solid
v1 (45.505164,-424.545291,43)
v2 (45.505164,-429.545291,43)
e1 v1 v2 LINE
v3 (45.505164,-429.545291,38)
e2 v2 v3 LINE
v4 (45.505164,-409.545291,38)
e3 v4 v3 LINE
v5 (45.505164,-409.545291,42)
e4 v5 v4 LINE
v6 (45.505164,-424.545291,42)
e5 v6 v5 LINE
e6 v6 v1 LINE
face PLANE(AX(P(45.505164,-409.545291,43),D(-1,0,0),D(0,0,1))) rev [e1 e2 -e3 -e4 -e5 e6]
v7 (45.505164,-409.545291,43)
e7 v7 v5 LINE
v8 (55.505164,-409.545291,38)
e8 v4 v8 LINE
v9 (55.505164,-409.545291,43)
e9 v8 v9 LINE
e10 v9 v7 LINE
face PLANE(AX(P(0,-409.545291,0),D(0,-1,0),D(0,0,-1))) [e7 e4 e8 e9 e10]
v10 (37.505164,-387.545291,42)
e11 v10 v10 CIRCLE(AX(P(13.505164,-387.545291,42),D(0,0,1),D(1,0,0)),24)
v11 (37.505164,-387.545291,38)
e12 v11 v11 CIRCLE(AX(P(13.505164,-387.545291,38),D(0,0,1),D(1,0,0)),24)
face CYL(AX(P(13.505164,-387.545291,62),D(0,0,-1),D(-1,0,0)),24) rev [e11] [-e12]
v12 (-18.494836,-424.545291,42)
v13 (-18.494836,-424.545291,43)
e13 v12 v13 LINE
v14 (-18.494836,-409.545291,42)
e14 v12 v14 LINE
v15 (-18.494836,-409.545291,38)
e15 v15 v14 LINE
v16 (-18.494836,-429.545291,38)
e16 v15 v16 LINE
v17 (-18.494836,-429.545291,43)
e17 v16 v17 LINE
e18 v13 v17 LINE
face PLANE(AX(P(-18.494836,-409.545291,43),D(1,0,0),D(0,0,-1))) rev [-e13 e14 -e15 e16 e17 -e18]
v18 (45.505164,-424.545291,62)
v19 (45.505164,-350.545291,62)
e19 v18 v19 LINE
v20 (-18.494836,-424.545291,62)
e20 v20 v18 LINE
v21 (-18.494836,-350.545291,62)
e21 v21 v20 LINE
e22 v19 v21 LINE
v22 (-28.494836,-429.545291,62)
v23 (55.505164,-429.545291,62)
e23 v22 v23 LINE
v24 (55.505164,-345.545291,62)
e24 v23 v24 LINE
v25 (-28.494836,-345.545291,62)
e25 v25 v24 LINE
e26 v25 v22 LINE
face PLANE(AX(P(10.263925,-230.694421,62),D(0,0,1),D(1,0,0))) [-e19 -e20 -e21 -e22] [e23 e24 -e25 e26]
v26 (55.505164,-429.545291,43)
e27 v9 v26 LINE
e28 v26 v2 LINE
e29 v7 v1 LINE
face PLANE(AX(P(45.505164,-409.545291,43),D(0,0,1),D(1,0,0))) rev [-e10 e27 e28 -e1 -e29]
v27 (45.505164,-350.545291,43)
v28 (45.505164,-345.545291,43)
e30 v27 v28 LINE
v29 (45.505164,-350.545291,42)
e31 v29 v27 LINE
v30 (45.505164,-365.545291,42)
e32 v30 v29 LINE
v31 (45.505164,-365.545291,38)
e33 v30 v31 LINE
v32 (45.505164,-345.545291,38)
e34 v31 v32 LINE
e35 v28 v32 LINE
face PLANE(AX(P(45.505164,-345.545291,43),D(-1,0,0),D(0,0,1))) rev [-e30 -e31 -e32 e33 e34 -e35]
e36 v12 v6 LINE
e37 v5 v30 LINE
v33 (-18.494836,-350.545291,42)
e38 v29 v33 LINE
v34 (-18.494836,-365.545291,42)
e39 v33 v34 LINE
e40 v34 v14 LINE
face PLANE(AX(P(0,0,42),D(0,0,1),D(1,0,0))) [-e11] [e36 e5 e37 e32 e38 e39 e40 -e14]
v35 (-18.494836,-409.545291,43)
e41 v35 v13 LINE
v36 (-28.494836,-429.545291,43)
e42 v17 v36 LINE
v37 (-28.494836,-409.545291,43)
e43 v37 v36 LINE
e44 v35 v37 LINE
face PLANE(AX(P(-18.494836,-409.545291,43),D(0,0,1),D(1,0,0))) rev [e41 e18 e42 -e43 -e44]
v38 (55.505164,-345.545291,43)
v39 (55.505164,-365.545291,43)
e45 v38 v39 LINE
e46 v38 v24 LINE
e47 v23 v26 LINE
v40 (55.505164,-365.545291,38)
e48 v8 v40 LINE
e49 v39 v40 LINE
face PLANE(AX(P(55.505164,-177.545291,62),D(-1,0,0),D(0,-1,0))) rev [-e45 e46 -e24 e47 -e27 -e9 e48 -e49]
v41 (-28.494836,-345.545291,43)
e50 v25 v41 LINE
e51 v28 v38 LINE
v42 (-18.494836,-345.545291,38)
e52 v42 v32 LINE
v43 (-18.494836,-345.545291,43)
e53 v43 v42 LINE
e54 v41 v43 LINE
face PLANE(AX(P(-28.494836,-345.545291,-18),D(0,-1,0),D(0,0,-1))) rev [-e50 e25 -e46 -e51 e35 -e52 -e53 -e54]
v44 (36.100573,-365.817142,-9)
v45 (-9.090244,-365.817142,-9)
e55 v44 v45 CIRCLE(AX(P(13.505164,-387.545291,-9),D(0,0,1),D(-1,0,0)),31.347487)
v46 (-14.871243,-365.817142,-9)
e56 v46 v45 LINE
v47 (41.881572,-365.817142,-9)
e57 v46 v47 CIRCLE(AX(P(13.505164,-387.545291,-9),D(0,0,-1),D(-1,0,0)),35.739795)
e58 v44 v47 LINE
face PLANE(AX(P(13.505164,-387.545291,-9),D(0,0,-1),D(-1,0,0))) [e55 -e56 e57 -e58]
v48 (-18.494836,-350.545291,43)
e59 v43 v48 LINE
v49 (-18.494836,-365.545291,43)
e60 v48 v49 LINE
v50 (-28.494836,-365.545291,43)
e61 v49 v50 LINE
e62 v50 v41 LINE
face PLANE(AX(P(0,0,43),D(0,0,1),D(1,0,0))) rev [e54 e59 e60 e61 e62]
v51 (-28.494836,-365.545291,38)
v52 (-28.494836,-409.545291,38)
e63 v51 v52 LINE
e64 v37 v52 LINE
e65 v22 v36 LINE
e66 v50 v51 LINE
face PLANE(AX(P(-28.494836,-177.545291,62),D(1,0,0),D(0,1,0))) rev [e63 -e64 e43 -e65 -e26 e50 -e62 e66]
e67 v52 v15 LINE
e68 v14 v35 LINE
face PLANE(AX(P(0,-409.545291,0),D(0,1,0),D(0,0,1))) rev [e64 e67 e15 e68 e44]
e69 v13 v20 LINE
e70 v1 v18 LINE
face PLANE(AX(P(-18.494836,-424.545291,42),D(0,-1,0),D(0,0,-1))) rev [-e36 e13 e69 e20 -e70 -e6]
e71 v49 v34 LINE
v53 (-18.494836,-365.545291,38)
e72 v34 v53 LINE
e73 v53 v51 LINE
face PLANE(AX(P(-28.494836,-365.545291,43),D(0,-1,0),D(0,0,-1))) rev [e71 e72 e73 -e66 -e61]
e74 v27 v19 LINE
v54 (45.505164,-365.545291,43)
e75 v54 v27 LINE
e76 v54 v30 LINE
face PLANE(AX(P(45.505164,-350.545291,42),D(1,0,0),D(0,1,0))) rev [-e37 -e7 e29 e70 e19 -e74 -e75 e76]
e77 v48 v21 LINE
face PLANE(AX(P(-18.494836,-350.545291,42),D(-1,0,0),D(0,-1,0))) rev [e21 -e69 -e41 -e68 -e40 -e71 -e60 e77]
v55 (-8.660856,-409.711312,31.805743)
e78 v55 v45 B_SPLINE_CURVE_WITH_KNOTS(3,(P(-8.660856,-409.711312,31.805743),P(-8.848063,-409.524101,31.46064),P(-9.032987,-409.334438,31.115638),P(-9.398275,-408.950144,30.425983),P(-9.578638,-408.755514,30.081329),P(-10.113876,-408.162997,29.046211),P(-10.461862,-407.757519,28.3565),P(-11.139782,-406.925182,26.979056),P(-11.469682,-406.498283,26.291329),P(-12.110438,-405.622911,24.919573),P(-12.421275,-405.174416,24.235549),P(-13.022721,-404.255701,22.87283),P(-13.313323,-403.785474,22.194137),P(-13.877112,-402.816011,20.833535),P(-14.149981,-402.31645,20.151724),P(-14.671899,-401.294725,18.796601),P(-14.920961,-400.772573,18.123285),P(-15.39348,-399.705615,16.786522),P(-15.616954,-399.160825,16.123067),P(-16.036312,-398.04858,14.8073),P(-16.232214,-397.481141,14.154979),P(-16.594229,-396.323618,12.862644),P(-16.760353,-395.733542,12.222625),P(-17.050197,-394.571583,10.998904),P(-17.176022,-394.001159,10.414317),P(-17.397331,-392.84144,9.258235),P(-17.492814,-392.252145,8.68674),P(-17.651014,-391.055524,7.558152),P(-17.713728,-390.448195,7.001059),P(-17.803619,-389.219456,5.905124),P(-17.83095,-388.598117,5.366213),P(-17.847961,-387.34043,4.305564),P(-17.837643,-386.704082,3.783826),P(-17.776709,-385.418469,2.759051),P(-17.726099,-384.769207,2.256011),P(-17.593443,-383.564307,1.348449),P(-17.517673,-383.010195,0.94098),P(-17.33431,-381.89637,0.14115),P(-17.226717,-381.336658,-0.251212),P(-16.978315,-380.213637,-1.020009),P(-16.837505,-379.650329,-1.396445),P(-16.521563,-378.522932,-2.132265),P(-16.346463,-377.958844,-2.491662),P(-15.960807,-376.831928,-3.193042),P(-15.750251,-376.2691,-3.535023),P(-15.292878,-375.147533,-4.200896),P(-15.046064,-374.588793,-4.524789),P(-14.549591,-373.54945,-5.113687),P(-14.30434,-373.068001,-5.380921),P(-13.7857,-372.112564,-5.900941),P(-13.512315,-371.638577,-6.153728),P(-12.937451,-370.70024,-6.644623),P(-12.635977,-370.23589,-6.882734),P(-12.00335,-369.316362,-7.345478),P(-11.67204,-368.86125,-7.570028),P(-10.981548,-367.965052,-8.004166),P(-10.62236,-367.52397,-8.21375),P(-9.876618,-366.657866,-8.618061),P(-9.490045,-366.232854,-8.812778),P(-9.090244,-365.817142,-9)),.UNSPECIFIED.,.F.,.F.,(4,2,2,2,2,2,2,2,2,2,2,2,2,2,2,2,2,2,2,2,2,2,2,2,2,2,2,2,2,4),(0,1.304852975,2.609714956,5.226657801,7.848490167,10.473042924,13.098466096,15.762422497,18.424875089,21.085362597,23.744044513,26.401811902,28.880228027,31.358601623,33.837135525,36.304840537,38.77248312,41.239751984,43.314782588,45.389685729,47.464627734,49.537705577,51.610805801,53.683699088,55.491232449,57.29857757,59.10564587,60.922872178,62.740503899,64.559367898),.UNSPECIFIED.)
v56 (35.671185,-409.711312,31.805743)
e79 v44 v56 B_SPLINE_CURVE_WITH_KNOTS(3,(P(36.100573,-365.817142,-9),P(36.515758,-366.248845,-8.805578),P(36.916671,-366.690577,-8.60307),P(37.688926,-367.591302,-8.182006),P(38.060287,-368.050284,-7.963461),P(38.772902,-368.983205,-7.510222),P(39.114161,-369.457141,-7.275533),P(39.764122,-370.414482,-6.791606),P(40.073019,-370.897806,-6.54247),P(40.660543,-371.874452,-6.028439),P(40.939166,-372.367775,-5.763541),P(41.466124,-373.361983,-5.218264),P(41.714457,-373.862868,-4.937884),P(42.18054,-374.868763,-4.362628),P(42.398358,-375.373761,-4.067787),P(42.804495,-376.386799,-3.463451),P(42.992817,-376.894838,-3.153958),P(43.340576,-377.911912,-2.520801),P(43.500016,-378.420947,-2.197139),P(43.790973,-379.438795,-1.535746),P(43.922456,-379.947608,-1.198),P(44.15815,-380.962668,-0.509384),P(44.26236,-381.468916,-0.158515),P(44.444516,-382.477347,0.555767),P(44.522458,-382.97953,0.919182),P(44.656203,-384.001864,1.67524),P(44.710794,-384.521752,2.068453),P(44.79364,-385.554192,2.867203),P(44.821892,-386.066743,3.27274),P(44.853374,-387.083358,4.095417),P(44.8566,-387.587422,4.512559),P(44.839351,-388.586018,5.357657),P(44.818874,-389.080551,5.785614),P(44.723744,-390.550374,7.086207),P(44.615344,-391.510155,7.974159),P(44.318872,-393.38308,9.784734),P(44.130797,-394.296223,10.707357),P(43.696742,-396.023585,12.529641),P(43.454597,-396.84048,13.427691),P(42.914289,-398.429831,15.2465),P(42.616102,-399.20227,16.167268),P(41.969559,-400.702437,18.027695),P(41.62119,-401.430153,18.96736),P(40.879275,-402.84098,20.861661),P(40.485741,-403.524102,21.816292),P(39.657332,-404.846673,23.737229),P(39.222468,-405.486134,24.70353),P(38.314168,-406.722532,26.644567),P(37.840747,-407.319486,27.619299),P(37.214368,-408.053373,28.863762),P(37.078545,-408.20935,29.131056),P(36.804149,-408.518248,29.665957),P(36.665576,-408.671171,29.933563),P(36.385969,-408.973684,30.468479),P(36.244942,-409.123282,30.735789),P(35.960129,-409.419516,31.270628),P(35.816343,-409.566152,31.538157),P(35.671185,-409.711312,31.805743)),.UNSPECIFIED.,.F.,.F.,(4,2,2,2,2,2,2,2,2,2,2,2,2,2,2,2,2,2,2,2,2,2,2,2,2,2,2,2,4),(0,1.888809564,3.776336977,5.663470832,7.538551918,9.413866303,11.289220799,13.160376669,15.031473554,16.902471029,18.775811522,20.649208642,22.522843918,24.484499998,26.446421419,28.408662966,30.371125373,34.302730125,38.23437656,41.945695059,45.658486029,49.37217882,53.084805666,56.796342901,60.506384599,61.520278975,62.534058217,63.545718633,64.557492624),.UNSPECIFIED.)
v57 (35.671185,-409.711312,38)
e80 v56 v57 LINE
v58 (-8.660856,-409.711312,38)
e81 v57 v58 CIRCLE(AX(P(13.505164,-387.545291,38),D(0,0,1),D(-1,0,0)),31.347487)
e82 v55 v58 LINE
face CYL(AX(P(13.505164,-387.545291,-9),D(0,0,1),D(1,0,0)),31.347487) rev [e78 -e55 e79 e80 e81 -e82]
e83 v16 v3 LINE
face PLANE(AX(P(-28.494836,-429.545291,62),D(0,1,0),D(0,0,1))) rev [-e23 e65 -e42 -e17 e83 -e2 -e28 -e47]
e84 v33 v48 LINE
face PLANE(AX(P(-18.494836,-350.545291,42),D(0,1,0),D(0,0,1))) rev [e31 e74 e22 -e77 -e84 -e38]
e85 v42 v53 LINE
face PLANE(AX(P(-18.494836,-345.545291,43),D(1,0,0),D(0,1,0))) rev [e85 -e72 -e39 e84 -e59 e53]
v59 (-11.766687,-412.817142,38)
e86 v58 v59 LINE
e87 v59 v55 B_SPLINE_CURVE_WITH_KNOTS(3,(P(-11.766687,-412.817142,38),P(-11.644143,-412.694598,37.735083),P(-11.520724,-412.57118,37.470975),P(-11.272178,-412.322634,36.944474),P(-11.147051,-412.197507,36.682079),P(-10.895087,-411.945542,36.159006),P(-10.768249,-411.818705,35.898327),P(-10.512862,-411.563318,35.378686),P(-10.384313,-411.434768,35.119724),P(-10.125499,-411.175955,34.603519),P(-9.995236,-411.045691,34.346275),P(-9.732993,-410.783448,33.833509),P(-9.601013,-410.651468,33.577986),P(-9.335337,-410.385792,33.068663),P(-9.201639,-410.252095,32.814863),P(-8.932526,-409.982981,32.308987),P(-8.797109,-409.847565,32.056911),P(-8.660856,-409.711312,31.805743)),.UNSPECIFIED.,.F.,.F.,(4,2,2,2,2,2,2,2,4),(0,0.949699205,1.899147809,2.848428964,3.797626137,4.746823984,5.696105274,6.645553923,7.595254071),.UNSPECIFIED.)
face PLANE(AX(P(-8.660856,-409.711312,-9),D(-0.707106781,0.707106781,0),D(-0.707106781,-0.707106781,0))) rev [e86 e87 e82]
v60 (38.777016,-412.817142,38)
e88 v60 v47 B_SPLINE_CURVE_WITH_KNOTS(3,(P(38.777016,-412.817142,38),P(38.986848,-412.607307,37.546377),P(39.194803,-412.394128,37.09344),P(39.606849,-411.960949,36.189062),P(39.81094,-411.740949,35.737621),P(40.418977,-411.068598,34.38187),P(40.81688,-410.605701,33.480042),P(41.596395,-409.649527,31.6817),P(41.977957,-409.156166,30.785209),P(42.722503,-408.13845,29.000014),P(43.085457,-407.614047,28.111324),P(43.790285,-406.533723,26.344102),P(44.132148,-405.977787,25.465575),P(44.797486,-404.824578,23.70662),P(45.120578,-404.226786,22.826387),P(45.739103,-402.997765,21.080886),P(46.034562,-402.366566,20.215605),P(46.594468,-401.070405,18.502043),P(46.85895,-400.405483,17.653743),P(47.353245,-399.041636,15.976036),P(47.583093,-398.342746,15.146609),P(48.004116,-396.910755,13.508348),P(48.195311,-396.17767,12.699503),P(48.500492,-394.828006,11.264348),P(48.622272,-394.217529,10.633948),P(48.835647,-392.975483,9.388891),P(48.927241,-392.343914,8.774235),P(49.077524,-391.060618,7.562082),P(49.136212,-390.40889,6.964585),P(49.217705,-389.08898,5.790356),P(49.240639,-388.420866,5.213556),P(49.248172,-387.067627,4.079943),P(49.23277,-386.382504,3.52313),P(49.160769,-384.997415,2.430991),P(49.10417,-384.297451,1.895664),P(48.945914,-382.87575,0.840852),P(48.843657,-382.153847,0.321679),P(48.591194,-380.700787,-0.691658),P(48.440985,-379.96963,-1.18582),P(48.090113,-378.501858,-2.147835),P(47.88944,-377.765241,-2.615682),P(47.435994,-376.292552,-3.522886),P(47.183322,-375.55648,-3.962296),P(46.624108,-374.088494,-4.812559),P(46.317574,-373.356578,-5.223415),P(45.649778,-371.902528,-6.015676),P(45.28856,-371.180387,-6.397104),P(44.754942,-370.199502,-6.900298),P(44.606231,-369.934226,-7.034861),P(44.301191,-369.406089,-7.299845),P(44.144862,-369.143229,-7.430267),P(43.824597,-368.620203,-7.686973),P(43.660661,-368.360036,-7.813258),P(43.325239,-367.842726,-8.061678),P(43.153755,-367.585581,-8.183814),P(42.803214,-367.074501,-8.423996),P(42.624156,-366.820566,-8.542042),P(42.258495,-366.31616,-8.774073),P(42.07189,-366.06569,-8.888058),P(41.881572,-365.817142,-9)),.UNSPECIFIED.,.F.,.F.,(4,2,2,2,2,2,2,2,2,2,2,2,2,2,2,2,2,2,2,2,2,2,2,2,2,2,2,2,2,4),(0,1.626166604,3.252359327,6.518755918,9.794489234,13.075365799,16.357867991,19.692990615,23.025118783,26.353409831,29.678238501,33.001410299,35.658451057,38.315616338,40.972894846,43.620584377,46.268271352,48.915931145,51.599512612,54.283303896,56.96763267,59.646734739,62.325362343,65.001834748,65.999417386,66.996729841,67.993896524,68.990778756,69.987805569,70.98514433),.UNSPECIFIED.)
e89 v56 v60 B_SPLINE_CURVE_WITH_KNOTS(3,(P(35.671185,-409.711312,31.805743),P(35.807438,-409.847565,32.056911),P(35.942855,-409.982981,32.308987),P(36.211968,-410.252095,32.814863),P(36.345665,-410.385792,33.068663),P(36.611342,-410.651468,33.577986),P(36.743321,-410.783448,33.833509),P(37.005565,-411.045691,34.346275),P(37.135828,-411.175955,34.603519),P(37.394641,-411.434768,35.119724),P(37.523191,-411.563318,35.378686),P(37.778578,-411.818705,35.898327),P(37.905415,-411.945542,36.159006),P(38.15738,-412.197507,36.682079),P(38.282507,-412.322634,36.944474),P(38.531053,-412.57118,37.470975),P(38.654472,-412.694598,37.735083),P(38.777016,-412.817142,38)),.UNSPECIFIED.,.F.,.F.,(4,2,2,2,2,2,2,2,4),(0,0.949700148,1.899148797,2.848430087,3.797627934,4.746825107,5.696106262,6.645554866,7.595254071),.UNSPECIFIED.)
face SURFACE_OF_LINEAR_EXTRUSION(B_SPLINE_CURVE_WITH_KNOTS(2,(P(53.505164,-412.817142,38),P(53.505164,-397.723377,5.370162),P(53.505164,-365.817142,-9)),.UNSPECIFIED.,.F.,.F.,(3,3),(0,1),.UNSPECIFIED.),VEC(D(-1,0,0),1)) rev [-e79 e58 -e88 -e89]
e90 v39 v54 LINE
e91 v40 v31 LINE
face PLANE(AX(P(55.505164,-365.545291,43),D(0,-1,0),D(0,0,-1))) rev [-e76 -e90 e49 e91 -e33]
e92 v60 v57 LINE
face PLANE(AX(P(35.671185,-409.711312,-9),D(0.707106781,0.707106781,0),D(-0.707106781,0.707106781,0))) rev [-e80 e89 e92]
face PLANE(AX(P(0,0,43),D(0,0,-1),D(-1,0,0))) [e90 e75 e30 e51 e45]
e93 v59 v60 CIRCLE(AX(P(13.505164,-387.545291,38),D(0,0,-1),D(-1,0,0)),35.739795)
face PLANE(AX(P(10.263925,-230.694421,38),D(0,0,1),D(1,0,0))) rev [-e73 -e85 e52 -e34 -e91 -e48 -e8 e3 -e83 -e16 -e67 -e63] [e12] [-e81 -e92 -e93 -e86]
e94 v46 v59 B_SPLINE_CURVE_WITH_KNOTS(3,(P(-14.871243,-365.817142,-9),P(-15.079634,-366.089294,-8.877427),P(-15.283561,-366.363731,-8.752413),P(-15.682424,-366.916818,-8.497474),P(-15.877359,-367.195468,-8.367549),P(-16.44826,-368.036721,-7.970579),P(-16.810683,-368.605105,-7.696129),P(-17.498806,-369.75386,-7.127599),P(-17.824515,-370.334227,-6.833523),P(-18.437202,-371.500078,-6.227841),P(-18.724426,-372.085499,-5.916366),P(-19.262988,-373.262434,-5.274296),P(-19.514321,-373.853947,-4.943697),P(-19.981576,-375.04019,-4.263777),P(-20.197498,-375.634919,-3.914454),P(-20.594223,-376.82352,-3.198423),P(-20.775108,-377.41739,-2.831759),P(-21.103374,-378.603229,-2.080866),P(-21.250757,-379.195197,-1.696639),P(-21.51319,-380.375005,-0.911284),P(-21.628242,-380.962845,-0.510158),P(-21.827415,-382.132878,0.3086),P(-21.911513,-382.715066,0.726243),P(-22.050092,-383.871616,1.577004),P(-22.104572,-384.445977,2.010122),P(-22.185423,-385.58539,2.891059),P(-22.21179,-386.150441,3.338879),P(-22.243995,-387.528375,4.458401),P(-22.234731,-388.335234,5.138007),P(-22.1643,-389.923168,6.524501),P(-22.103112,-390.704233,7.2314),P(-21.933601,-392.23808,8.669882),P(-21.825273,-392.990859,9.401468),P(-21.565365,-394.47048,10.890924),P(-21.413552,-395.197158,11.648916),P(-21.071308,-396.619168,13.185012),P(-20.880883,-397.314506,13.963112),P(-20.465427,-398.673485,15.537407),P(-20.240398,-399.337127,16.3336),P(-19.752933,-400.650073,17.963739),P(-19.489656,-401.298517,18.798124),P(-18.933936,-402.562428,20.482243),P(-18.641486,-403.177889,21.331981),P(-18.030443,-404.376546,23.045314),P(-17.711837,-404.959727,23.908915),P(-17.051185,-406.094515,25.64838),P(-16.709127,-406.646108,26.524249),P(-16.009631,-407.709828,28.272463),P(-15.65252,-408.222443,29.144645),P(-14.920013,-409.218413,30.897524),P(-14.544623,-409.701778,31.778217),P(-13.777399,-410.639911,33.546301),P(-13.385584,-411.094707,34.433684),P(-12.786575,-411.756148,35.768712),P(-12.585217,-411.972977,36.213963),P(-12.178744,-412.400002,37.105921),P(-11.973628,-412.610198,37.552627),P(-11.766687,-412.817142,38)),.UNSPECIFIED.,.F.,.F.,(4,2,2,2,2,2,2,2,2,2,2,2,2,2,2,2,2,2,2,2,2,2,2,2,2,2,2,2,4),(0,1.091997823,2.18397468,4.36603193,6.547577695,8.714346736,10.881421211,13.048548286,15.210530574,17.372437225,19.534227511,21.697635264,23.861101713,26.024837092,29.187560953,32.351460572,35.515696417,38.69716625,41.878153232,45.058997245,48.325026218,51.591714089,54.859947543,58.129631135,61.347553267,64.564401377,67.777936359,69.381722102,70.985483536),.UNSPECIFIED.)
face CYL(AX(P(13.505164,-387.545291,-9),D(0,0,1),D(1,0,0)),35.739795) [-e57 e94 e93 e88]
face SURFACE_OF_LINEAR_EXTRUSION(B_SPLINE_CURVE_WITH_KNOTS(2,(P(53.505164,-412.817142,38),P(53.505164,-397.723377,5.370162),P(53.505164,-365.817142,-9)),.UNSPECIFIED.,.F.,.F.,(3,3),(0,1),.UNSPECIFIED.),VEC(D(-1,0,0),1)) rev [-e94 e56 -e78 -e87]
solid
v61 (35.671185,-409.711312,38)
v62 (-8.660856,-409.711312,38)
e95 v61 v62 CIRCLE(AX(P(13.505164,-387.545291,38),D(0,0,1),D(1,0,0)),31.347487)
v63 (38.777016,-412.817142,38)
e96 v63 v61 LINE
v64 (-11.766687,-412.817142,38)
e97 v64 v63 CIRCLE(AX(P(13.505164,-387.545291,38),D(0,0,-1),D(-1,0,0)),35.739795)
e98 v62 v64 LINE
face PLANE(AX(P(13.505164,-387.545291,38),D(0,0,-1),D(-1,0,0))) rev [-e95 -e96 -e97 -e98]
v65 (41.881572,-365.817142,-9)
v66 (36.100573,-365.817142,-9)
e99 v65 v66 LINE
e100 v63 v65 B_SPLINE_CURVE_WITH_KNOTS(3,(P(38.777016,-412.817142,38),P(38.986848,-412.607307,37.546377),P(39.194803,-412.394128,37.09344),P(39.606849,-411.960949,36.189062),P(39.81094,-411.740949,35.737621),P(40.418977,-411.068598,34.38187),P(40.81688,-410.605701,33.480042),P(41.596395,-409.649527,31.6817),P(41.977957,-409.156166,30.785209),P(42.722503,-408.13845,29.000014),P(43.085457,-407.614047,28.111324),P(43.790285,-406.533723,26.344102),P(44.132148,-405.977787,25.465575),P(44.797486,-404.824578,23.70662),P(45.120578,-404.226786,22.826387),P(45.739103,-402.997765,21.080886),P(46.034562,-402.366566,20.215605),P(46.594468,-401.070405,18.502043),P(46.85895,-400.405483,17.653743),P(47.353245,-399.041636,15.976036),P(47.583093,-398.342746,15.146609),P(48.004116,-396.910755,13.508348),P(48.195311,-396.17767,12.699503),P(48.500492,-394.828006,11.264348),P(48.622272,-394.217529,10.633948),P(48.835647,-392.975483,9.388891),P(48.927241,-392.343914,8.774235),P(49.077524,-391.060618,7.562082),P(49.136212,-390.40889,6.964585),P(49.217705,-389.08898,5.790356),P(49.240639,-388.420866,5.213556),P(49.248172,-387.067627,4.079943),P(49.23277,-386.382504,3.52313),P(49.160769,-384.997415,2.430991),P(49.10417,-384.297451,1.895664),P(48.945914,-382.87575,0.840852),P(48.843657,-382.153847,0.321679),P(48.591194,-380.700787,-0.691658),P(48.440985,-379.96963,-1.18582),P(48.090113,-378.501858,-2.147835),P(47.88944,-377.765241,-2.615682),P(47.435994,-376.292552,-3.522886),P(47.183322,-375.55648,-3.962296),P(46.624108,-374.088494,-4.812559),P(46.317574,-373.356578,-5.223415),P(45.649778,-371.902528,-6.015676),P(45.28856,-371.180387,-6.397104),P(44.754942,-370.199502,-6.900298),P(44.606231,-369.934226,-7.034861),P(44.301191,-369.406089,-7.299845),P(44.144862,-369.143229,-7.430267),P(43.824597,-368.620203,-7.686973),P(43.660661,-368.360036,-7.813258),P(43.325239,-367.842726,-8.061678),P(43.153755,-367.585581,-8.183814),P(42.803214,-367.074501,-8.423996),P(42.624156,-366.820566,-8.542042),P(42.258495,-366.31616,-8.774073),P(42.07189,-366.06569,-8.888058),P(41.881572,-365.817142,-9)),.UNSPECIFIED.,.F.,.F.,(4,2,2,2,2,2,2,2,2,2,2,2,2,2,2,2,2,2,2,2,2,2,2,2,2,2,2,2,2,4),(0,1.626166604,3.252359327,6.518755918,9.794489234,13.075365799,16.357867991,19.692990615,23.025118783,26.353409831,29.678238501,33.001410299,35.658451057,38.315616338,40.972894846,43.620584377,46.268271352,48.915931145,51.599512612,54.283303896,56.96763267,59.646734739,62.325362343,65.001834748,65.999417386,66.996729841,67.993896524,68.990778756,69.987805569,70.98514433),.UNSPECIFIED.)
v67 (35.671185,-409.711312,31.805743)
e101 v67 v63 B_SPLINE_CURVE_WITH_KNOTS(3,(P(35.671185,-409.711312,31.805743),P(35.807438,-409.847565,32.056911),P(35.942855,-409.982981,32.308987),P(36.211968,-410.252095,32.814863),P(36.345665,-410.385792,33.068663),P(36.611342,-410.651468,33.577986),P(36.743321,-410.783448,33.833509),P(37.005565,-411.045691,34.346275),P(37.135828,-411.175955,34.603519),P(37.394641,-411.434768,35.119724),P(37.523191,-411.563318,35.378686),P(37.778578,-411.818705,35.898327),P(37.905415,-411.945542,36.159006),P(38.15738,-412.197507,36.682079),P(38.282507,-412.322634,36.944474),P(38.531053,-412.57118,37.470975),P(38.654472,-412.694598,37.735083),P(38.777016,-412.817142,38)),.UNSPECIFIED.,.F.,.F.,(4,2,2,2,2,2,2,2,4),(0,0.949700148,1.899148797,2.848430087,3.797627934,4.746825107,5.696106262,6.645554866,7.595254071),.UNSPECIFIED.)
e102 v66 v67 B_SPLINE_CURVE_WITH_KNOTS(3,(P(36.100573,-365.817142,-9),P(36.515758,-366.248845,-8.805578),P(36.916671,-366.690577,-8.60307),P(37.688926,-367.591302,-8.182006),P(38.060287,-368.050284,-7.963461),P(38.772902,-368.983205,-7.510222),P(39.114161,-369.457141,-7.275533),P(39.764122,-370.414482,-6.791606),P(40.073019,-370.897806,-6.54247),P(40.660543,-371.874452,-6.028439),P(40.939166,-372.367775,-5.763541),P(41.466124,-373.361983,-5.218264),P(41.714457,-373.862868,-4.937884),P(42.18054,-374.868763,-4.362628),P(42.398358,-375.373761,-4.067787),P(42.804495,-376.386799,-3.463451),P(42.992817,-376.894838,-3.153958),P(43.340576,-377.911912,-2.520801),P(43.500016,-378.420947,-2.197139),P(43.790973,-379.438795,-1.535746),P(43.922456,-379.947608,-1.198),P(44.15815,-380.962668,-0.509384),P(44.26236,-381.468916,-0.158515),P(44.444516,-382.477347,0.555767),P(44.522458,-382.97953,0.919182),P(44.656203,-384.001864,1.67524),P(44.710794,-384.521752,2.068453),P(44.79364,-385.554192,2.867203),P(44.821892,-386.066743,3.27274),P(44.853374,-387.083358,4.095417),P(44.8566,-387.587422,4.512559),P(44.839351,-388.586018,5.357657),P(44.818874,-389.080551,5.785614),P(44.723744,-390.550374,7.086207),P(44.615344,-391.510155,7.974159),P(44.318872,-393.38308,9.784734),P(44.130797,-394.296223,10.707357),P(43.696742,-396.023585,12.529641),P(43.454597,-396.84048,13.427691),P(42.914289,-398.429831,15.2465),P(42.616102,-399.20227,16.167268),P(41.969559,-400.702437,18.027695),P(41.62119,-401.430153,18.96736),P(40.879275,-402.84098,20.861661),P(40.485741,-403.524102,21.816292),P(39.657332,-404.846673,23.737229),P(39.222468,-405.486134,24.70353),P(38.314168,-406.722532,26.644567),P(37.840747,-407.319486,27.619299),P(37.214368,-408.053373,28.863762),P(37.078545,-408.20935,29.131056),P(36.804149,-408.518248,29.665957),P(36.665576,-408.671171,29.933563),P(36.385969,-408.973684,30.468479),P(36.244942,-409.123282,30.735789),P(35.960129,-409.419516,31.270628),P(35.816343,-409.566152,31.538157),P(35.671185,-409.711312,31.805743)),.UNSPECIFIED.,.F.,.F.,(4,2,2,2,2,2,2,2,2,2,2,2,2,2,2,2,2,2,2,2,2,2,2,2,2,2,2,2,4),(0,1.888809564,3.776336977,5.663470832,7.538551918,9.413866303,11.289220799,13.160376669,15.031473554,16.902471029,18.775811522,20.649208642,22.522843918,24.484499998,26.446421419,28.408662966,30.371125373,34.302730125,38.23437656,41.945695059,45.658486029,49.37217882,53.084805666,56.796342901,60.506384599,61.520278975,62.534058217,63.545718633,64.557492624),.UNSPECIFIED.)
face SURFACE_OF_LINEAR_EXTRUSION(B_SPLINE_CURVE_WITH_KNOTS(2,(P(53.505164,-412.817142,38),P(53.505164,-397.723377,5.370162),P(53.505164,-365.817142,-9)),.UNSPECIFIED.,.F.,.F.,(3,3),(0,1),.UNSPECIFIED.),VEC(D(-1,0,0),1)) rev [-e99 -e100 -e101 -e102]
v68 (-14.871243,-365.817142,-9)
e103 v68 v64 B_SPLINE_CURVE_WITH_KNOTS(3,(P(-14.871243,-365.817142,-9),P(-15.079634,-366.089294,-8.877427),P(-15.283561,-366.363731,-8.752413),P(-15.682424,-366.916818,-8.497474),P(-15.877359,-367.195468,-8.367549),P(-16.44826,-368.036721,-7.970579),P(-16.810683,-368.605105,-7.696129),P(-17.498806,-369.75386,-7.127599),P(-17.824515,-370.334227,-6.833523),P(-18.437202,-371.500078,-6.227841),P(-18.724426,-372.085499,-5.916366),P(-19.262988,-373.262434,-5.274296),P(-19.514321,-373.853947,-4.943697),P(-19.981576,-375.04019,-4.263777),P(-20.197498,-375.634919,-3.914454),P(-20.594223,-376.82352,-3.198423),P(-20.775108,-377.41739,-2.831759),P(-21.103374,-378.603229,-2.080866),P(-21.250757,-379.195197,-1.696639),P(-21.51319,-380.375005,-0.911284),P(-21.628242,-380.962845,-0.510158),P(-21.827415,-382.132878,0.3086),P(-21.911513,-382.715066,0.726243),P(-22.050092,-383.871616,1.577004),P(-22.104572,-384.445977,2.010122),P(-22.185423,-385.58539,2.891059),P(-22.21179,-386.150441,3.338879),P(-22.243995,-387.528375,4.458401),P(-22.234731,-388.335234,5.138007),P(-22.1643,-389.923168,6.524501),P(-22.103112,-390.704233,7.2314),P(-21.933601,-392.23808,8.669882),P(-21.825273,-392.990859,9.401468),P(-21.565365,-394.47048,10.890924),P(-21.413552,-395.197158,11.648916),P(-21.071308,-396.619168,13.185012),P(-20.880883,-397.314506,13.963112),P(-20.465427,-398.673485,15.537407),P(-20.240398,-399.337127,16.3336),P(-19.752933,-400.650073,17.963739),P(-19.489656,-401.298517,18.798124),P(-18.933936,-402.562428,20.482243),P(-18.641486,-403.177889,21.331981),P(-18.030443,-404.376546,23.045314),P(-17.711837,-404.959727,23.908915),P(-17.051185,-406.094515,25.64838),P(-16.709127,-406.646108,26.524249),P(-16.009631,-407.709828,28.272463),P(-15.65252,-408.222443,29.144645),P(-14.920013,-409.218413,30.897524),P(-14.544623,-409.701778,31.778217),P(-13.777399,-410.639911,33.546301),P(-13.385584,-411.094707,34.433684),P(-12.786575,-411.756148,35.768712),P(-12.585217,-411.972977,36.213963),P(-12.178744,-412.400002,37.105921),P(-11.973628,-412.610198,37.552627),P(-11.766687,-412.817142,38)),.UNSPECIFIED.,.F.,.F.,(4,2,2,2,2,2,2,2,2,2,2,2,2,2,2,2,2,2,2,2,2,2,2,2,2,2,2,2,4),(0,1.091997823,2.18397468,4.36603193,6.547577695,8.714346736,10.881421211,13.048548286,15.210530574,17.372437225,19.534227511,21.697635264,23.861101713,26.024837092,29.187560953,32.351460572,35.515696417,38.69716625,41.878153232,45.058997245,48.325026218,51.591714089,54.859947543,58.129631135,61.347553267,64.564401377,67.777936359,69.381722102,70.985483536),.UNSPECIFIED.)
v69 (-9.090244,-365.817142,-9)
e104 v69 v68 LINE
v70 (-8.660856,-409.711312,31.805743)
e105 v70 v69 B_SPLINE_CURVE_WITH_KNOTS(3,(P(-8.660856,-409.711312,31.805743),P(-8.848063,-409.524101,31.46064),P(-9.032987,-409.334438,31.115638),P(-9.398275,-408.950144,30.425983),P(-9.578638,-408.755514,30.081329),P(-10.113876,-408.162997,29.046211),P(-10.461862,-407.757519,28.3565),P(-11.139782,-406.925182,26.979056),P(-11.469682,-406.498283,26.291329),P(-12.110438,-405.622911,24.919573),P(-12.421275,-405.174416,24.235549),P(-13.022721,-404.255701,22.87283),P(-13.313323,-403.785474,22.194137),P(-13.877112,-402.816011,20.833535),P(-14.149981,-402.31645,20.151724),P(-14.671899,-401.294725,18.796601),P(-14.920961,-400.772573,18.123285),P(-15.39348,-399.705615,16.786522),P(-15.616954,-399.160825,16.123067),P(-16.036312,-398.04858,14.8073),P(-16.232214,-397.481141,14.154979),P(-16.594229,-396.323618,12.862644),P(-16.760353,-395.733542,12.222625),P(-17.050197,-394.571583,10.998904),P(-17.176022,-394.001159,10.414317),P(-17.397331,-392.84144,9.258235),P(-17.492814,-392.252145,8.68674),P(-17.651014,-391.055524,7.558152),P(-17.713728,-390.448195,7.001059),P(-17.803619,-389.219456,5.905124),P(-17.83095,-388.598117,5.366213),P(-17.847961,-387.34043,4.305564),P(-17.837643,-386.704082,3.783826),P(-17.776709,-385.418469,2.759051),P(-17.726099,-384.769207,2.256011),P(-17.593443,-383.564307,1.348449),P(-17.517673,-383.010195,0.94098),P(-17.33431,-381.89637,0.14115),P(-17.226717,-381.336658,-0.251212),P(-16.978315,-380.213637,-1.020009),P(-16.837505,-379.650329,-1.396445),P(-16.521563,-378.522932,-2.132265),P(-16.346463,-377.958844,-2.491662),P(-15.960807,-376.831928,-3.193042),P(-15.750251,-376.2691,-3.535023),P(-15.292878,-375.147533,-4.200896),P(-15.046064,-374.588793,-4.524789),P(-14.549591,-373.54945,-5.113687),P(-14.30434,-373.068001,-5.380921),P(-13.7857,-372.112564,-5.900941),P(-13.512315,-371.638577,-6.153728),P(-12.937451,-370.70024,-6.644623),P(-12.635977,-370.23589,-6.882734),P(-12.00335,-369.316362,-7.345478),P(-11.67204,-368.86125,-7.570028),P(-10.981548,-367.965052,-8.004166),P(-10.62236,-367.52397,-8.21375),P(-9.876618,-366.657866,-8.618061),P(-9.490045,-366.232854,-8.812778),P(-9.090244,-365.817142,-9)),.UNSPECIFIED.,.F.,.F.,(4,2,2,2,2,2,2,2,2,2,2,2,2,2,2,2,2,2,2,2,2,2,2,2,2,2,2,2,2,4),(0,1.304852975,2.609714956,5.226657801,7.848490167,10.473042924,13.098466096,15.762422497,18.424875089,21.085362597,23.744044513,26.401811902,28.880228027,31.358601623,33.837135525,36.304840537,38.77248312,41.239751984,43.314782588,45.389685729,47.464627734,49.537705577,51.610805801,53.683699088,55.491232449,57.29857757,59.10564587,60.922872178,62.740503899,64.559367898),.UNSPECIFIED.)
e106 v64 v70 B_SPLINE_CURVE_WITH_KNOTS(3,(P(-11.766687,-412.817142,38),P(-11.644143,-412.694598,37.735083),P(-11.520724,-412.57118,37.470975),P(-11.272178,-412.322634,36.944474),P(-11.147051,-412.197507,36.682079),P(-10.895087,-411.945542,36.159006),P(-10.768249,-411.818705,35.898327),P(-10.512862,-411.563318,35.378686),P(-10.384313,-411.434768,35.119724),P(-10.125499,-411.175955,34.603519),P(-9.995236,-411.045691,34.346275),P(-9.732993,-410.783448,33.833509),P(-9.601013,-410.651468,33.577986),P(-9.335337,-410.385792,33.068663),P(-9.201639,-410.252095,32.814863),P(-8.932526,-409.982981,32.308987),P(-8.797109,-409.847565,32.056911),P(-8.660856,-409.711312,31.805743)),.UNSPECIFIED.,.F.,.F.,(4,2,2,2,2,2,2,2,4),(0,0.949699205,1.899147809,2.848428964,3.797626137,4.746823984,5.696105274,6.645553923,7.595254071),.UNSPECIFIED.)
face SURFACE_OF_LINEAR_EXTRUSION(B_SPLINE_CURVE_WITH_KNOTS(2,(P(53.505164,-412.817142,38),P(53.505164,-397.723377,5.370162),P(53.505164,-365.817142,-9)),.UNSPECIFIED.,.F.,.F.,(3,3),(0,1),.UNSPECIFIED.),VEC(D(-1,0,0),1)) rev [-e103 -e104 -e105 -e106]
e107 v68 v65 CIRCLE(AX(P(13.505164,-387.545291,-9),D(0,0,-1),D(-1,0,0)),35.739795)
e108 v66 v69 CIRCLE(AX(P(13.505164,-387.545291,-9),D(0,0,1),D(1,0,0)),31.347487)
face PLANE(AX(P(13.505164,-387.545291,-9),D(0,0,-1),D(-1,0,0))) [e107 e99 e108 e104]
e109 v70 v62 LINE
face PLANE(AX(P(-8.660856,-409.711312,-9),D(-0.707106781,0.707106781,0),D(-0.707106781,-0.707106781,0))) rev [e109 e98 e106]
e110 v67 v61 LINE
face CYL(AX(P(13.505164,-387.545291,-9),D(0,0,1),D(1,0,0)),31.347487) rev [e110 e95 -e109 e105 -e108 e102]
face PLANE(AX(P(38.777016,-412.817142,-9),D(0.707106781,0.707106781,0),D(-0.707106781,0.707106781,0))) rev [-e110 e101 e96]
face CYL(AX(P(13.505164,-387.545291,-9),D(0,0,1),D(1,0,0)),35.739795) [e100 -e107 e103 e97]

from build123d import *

# Parameters (mm, degrees)
SKETCH2_W           = 350
SKETCH2_H           = 1050
SKETCH2_R           = 100
BOSS_EXTRUDE2_DEPTH = 100
SCALE1_SCALE        = 0.24
SKETCH6_W           = 84
SKETCH6_H           = 168
CUT_EXTRUDE3_DEPTH  = 80
SKETCH11_W          = 64
SKETCH11_H          = 74
CUT_EXTRUDE8_DEPTH  = 20
SKETCH12_W          = 10
SKETCH12_H          = 5
BOSS_EXTRUDE6_DEPTH = 20
SKETCH13_W          = 10
SKETCH13_H          = 5
BOSS_EXTRUDE7_DEPTH = 20
SKETCH14_W          = 10
SKETCH14_H          = 5
CUT_EXTRUDE9_DEPTH  = 40
SKETCH15_W          = 10
SKETCH15_H          = 5
CUT_EXTRUDE10_DEPTH = 40
SKETCH16_W          = 10
SKETCH16_H          = 20
CUT_EXTRUDE11_DEPTH = 5
SKETCH17_W          = 10
SKETCH17_H          = 20
CUT_EXTRUDE12_DEPTH = 5
BOSS_EXTRUDE9_DEPTH = 47
SWEEP3_START        = -9
SWEEP3_DEPTH        = 47
CUT_EXTRUDE13_DEPTH = 82


# Read off the part's stored shape, not the designer's step: Sweep3
with BuildPart() as part:
    # Sketch2 → Boss-Extrude2 (new body)
    with BuildSketch(Plane.XY):
        with Locations((13.505164405, -303.545290931)):
            Rectangle(SKETCH2_W, SKETCH2_H)
        with Locations((13.505164405, 46.454709069)):
            Circle(SKETCH2_R, mode=Mode.SUBTRACT)
        with Locations((13.505164405, -303.545290931)):
            Circle(SKETCH2_R, mode=Mode.SUBTRACT)
        with Locations((13.505164405, -653.545290931)):
            Circle(SKETCH2_R, mode=Mode.SUBTRACT)
    extrude(amount=BOSS_EXTRUDE2_DEPTH)


with BuildPart() as part_1:
    # Scale1: scaled about (13.505164405, -303.545290931, 50)
    add(part.part.scale(SCALE1_SCALE).moved(Location((10.263924948, -230.694421108, 38))))

    # Sketch6 → Cut-Extrude3 (cut)
    with BuildSketch(Plane.XY.offset(62)):
        with Locations((13.505164405, -261.545290931)):
            Rectangle(SKETCH6_W, SKETCH6_H)
    extrude(amount=-CUT_EXTRUDE3_DEPTH, mode=Mode.SUBTRACT)

    # Sketch11 → Cut-Extrude8 (cut)
    with BuildSketch(Plane.XY.offset(62)):
        with Locations((13.505164405, -387.545290931)):
            Rectangle(SKETCH11_W, SKETCH11_H)
    extrude(amount=-CUT_EXTRUDE8_DEPTH, mode=Mode.SUBTRACT)

    # Sketch12 → Boss-Extrude6 (add)
    with BuildSketch(Plane(origin=(0, -429.545290931, 0), x_dir=(-1, 0, 0), z_dir=(0, -1, 0))):
        with Locations((23.494835595, -40.5)):
            Rectangle(SKETCH12_W, SKETCH12_H)
    extrude(amount=BOSS_EXTRUDE6_DEPTH)

    # Sketch13 → Boss-Extrude7 (add)
    with BuildSketch(Plane(origin=(0, -429.545290931, 0), x_dir=(-1, 0, 0), z_dir=(0, -1, 0))):
        with Locations((-50.505164405, -40.5)):
            Rectangle(SKETCH13_W, SKETCH13_H)
    extrude(amount=BOSS_EXTRUDE7_DEPTH)

    # Sketch14 → Cut-Extrude9 (cut)
    with BuildSketch(Plane.XZ.offset(449.545290931)):
        with Locations((-23.494835595, 40.5)):
            Rectangle(SKETCH14_W, SKETCH14_H)
    extrude(amount=-CUT_EXTRUDE9_DEPTH, mode=Mode.SUBTRACT)

    # Sketch15 → Cut-Extrude10 (cut)
    with BuildSketch(Plane(origin=(0, -449.545290931, 0), x_dir=(-1, 0, 0), z_dir=(0, -1, 0))):
        with Locations((-50.505164405, -40.5)):
            Rectangle(SKETCH15_W, SKETCH15_H)
    extrude(amount=-CUT_EXTRUDE10_DEPTH, mode=Mode.SUBTRACT)

    # Sketch16 → Cut-Extrude11 (cut)
    with BuildSketch(Plane(origin=(0, 0, 38), x_dir=(-1, 0, 0), z_dir=(0, 0, -1))):
        with Locations((23.494835595, -355.545290931)):
            Rectangle(SKETCH16_W, SKETCH16_H)
    extrude(amount=-CUT_EXTRUDE11_DEPTH, mode=Mode.SUBTRACT)

    # Sketch17 → Cut-Extrude12 (cut)
    with BuildSketch(Plane(origin=(0, 0, 38), x_dir=(-1, 0, 0), z_dir=(0, 0, -1))):
        with Locations((-50.505164405, -355.545290931)):
            Rectangle(SKETCH17_W, SKETCH17_H)
    extrude(amount=-CUT_EXTRUDE12_DEPTH, mode=Mode.SUBTRACT)

    # Sketch18 → Boss-Extrude9 (add)
    with BuildSketch(Plane(origin=(0, 0, 38), x_dir=(-1, 0, 0), z_dir=(0, 0, -1))):
        with BuildLine():
            Line((-35.671185106, -409.711311632), (-38.7770157, -412.817142227))
            ThreePointArc((-38.7770157, -412.817142227), (-13.505164405, -351.805496082), (11.766686891, -412.817142227))
            Line((11.766686891, -412.817142227), (8.660856297, -409.711311632))
            ThreePointArc((8.660856297, -409.711311632), (-13.505164405, -356.197803831), (-35.671185106, -409.711311632))
        make_face()
    extrude(amount=BOSS_EXTRUDE9_DEPTH)


with BuildPart() as body_2:
    # Sweep3 outline → Sweep3 (new body)
    with BuildSketch(Plane.XY.offset(SWEEP3_START)):
        with BuildLine():
            Line((35.671185106, -409.711311632), (38.7770157, -412.817142227))
            ThreePointArc((38.7770157, -412.817142227), (13.505164405, -351.805496082), (-11.766686891, -412.817142227))
            Line((-11.766686891, -412.817142227), (-8.660856297, -409.711311632))
            ThreePointArc((-8.660856297, -409.711311632), (13.505164404, -356.197803831), (35.671185106, -409.711311632))
        make_face()
    extrude(amount=SWEEP3_DEPTH)


with BuildPart() as cut_extrude13_tool:
    # Sketch27 → Cut-Extrude13 (new body)
    with BuildSketch(Plane.ZY.offset(28.494835595)):
        with BuildLine():
            Line((38, -412.817142227), (-9, -412.817142227))
            Line((-9, -412.817142227), (-9, -365.817142227))
            add(Edge.make_bspline(
                [(-9, -365.817142227), (5.370162337, -397.723377267), (38, -412.817142227)],
                knots=[0, 0, 0, 1, 1, 1], degree=2))
        make_face()
    extrude(amount=-CUT_EXTRUDE13_DEPTH)


with BuildPart() as part_2:
    add(part_1.part)

    # Cut-Extrude13: cut by cut_extrude13_tool
    add(cut_extrude13_tool.part, mode=Mode.SUBTRACT)


with BuildPart() as body_2_1:
    add(body_2.part)

    # Cut-Extrude13: cut by cut_extrude13_tool
    add(cut_extrude13_tool.part, mode=Mode.SUBTRACT)


solid = Compound([part_2.part, body_2_1.part])
